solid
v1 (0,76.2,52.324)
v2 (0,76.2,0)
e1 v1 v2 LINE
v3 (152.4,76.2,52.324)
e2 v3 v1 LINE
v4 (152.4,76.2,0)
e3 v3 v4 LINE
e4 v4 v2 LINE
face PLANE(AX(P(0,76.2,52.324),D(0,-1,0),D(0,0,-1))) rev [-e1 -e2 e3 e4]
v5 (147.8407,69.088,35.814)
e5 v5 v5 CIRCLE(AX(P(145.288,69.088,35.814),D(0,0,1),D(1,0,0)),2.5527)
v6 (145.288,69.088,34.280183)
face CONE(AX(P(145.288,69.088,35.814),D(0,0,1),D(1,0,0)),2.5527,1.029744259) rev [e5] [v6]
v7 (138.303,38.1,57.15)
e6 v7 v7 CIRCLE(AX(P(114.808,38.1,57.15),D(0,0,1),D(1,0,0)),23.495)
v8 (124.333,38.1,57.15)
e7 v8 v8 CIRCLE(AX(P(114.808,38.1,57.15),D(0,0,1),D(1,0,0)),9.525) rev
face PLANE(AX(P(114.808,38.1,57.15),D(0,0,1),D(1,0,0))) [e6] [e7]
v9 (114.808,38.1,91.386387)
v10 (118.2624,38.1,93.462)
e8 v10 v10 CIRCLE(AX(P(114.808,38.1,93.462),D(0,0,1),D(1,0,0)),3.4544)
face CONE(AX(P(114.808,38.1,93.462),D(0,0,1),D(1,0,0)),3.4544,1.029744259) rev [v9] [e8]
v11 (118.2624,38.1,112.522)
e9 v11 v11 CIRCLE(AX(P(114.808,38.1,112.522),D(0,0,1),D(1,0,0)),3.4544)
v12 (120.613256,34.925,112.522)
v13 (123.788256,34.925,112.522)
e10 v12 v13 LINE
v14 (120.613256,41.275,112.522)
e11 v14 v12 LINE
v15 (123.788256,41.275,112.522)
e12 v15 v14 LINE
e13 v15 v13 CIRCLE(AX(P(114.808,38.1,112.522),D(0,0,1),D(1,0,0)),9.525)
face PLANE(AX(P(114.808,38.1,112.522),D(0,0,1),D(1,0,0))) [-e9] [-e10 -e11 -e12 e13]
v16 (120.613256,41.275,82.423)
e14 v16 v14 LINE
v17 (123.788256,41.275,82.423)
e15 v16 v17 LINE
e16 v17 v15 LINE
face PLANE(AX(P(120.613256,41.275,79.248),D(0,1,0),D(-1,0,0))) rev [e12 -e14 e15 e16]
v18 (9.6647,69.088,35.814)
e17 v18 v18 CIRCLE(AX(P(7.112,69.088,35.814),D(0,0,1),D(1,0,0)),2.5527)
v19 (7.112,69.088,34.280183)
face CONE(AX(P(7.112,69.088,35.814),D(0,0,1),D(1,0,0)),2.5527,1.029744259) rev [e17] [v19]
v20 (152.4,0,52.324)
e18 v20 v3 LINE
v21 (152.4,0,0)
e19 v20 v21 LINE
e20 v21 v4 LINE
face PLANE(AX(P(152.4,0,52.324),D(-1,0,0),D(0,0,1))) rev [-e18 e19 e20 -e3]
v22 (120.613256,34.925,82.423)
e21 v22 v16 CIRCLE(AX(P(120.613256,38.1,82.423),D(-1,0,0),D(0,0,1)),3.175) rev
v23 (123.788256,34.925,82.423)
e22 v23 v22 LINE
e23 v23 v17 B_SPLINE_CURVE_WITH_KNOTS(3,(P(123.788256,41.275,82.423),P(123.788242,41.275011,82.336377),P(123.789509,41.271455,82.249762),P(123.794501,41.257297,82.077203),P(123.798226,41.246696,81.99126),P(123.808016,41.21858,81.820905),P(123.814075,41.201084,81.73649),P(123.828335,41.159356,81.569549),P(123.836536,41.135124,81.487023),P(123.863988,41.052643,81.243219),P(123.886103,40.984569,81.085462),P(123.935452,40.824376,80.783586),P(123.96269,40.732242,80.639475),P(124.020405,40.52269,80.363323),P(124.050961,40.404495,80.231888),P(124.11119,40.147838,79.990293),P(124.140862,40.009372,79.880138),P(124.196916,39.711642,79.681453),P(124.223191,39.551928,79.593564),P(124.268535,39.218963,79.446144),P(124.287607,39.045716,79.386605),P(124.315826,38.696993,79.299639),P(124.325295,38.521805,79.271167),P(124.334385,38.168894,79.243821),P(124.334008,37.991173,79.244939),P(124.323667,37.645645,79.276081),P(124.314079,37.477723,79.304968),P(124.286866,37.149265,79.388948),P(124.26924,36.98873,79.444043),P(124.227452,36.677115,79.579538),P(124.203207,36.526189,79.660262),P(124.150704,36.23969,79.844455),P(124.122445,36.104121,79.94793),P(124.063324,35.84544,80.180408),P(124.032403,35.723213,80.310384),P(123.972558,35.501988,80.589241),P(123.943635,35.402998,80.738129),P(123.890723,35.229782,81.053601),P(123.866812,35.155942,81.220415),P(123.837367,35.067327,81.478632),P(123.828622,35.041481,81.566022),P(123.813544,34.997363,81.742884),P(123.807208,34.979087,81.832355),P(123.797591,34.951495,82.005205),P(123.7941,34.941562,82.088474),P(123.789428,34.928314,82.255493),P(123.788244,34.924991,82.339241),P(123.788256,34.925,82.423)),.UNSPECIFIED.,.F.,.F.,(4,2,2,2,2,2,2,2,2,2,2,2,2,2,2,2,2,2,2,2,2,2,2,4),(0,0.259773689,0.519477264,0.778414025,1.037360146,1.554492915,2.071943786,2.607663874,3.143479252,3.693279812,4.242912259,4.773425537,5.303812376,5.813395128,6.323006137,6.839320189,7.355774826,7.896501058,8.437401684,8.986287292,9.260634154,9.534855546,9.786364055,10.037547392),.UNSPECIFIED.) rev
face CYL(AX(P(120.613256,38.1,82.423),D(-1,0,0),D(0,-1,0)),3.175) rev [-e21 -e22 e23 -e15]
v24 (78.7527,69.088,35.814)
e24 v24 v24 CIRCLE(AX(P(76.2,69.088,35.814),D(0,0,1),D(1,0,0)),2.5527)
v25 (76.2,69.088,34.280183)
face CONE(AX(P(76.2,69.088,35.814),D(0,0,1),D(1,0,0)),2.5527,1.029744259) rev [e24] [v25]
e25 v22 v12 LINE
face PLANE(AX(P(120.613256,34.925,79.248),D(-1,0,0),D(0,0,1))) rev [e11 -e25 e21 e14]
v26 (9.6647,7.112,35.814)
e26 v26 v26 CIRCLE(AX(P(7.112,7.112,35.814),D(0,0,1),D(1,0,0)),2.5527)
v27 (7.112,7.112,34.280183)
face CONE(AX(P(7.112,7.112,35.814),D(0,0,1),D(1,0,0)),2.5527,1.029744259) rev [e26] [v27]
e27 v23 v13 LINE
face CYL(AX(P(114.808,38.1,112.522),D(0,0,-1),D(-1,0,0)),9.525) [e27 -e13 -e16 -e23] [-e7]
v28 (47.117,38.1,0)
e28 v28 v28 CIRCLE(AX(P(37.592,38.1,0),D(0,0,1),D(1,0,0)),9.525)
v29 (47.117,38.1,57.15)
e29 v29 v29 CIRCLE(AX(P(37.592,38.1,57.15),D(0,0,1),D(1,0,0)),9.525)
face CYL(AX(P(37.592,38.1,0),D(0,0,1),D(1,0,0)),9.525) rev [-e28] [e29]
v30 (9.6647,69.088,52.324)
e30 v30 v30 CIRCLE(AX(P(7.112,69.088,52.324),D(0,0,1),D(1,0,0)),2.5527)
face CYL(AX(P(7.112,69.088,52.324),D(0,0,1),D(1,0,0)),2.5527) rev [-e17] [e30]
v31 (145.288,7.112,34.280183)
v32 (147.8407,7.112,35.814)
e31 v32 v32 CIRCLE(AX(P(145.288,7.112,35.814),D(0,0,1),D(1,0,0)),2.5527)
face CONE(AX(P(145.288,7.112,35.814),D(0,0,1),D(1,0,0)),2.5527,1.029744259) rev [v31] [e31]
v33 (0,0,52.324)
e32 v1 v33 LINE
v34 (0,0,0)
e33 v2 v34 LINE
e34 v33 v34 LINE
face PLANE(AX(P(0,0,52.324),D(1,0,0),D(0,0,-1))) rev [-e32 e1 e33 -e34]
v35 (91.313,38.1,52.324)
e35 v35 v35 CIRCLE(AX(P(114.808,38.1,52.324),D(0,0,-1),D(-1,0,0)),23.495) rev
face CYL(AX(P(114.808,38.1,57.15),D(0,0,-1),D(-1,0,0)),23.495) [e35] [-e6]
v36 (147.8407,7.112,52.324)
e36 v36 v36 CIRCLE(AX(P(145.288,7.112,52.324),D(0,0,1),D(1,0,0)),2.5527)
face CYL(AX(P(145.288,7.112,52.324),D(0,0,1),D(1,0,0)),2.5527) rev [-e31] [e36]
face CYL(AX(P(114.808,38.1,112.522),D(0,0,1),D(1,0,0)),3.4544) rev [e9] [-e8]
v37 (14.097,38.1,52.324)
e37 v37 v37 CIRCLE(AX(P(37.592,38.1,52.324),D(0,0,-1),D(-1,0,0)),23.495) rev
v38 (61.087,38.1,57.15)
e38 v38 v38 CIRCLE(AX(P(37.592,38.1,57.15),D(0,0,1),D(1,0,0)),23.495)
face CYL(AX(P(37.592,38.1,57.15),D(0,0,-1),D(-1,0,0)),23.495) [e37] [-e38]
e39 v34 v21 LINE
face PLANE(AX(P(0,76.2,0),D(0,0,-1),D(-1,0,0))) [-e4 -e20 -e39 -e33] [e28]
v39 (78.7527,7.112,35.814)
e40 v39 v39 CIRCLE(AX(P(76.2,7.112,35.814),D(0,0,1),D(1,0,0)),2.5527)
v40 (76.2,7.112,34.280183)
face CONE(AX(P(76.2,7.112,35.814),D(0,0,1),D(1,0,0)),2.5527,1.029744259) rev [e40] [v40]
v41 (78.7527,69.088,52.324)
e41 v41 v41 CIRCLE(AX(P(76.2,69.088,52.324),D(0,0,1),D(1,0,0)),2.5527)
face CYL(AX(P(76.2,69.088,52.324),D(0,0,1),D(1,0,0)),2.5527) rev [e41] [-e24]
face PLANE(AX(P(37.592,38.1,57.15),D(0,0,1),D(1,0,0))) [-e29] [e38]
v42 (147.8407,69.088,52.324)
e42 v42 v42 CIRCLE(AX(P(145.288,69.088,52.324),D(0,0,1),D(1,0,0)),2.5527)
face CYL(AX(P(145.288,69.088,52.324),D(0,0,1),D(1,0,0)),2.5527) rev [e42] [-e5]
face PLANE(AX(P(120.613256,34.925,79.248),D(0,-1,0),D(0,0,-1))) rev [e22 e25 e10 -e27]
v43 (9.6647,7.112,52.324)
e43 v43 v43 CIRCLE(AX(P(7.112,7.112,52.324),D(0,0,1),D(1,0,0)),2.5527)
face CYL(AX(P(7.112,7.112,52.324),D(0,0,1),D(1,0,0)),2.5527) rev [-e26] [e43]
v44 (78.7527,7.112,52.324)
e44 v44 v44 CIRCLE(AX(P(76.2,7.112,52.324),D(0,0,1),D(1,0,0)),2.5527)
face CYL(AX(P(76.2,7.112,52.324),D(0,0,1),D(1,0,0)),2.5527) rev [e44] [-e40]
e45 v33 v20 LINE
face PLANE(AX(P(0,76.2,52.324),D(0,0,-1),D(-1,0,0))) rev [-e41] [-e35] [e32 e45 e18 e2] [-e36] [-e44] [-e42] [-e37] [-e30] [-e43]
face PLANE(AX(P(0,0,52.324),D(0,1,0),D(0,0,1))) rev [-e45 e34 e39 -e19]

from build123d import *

# Parameters (mm, degrees)
SKETCH1_W                        = 152.4
SKETCH1_H                        = 76.2
BOSS_EXTRUDE1_DEPTH              = 52.324
F_1_4_20_TAPPED_HOLE1_AT_2_COUNT = 2
F_1_4_20_TAPPED_HOLE1_AT_2_PITCH = 69.088
F_1_4_20_TAPPED_HOLE1_AT_3_COUNT = 2
F_1_4_20_TAPPED_HOLE1_AT_3_PITCH = 69.088
SKETCH4_R                        = 23.495
BOSS_EXTRUDE2_DEPTH              = 4.826
SKETCH5_R                        = 9.525
BOSS_EXTRUDE3_DEPTH              = 60.198
CUT_EXTRUDE1_START               = -33.274
CUT_EXTRUDE1_DEPTH               = 33.274
FILLET1_R                        = 3.175
SKETCH7_R                        = 9.525
CUT_EXTRUDE2_DEPTH               = 180.717340566
F_5_16_24_TAPPED_HOLE1_D         = 6.9088
F_5_16_24_TAPPED_HOLE1_DEPTH     = 19.06
F_5_16_24_TAPPED_HOLE1_TIP       = 2.075612922


with BuildPart() as part:
    # Sketch1 → Boss-Extrude1 (new body)
    with BuildSketch(Plane.XY):
        with Locations((76.2, 38.1)):
            Rectangle(SKETCH1_W, SKETCH1_H)
    extrude(amount=BOSS_EXTRUDE1_DEPTH)

    # Sketch2 → 1/4-20 Tapped Hole1 (revolve, cut)
    with BuildSketch(Plane(origin=(76.2, 69.088, 52.324), x_dir=(0, -1, 0), z_dir=(1, 0, 0))):
        Polygon((0, 0), (0, 18.043816902), (2.5527, 16.51), (2.5527, 0), align=None)
    f_1_4_20_tapped_hole1 = revolve(axis=Axis((76.2, 69.088, 58.674), (0, 0, -1)), mode=Mode.SUBTRACT)

    # 1/4-20 Tapped Hole1 at 2: 1/4-20 Tapped Hole1 ×2
    with Locations(*[(-i * F_1_4_20_TAPPED_HOLE1_AT_2_PITCH, 0, 0) for i in range(1, F_1_4_20_TAPPED_HOLE1_AT_2_COUNT)]):
        add(f_1_4_20_tapped_hole1, mode=Mode.SUBTRACT)

    # 1/4-20 Tapped Hole1 at 3: 1/4-20 Tapped Hole1 ×2
    with Locations(*[(i * F_1_4_20_TAPPED_HOLE1_AT_3_PITCH, 0, 0) for i in range(1, F_1_4_20_TAPPED_HOLE1_AT_3_COUNT)]):
        add(f_1_4_20_tapped_hole1, mode=Mode.SUBTRACT)

    # Mirror1: 1/4-20 Tapped Hole1 across plane
    add(f_1_4_20_tapped_hole1.mirror(Plane.ZX.offset(38.1)), mode=Mode.SUBTRACT)

    # Mirror1 copy 1 sketch → Mirror1 copy 1 (revolve, cut)
    with BuildSketch(Plane(origin=(7.112, 7.112, 52.324), x_dir=(0, 1, 0), z_dir=(1, 0, 0))):
        Polygon((0, 0), (0, -18.043816902), (2.5527, -16.51), (2.5527, 0), align=None)
    revolve(axis=Axis((7.112, 7.112, 58.674), (0, 0, 1)), mode=Mode.SUBTRACT)

    # Mirror1 copy 2 sketch → Mirror1 copy 2 (revolve, cut)
    with BuildSketch(Plane(origin=(145.288, 7.112, 52.324), x_dir=(0, 1, 0), z_dir=(1, 0, 0))):
        Polygon((0, 0), (0, -18.043816902), (2.5527, -16.51), (2.5527, 0), align=None)
    revolve(axis=Axis((145.288, 7.112, 58.674), (0, 0, 1)), mode=Mode.SUBTRACT)

    # Sketch4 → Boss-Extrude2 (add)
    with BuildSketch(Plane.XY.offset(52.324)):
        with Locations(Location((37.592, 38.1, 0), (0, 0, 180))):
            Circle(SKETCH4_R)
        with Locations(Location((114.808, 38.1, 0), (0, 0, 180))):
            Circle(SKETCH4_R)
    extrude(amount=BOSS_EXTRUDE2_DEPTH)

    # Sketch5 → Boss-Extrude3 (add)
    with BuildSketch(Plane.XY.offset(52.324)):
        with Locations(Location((114.808, 38.1, 0), (0, 0, 180))):
            Circle(SKETCH5_R)
    extrude(amount=BOSS_EXTRUDE3_DEPTH)

    # Sketch6 → Cut-Extrude1 (cut)
    with BuildSketch(Plane.XY.offset(112.522).offset(CUT_EXTRUDE1_START)):
        with BuildLine():
            Line((120.613256121, 34.925), (120.613256121, 41.275))
            Line((120.613256121, 41.275), (123.788256121, 41.275))
            ThreePointArc((123.788256121, 41.275), (124.333, 38.1), (123.788256121, 34.925))
            Line((123.788256121, 34.925), (120.613256121, 34.925))
        make_face()
    extrude(amount=CUT_EXTRUDE1_DEPTH, mode=Mode.SUBTRACT)

    # Fillet1
    fillet1_edges = [part.edges().sort_by_distance(p)[0] for p in [
        (122.200756121, 41.275, 79.248),
        (122.200756121, 34.925, 79.248),
    ]]
    fillet(fillet1_edges, radius=FILLET1_R - 0.0001)  # a hair under: the kernel refuses the full size

    # Sketch7 → Cut-Extrude2 (cut, through all)
    with BuildSketch(Plane.XY.offset(57.15)):
        with Locations((37.592, 38.1)):
            Circle(SKETCH7_R)
    extrude(amount=-CUT_EXTRUDE2_DEPTH, mode=Mode.SUBTRACT)

    # 5/16-24 Tapped Hole1
    with Locations(Plane.XY.offset(112.522)):
        with Locations((114.808, 38.1)):
            Hole(F_5_16_24_TAPPED_HOLE1_D / 2, depth=F_5_16_24_TAPPED_HOLE1_DEPTH)
            with Locations((0, 0, -(F_5_16_24_TAPPED_HOLE1_DEPTH + F_5_16_24_TAPPED_HOLE1_TIP / 2))):  # 118° drill point
                Cone(0, F_5_16_24_TAPPED_HOLE1_D / 2, F_5_16_24_TAPPED_HOLE1_TIP, mode=Mode.SUBTRACT)


solid = part.part
